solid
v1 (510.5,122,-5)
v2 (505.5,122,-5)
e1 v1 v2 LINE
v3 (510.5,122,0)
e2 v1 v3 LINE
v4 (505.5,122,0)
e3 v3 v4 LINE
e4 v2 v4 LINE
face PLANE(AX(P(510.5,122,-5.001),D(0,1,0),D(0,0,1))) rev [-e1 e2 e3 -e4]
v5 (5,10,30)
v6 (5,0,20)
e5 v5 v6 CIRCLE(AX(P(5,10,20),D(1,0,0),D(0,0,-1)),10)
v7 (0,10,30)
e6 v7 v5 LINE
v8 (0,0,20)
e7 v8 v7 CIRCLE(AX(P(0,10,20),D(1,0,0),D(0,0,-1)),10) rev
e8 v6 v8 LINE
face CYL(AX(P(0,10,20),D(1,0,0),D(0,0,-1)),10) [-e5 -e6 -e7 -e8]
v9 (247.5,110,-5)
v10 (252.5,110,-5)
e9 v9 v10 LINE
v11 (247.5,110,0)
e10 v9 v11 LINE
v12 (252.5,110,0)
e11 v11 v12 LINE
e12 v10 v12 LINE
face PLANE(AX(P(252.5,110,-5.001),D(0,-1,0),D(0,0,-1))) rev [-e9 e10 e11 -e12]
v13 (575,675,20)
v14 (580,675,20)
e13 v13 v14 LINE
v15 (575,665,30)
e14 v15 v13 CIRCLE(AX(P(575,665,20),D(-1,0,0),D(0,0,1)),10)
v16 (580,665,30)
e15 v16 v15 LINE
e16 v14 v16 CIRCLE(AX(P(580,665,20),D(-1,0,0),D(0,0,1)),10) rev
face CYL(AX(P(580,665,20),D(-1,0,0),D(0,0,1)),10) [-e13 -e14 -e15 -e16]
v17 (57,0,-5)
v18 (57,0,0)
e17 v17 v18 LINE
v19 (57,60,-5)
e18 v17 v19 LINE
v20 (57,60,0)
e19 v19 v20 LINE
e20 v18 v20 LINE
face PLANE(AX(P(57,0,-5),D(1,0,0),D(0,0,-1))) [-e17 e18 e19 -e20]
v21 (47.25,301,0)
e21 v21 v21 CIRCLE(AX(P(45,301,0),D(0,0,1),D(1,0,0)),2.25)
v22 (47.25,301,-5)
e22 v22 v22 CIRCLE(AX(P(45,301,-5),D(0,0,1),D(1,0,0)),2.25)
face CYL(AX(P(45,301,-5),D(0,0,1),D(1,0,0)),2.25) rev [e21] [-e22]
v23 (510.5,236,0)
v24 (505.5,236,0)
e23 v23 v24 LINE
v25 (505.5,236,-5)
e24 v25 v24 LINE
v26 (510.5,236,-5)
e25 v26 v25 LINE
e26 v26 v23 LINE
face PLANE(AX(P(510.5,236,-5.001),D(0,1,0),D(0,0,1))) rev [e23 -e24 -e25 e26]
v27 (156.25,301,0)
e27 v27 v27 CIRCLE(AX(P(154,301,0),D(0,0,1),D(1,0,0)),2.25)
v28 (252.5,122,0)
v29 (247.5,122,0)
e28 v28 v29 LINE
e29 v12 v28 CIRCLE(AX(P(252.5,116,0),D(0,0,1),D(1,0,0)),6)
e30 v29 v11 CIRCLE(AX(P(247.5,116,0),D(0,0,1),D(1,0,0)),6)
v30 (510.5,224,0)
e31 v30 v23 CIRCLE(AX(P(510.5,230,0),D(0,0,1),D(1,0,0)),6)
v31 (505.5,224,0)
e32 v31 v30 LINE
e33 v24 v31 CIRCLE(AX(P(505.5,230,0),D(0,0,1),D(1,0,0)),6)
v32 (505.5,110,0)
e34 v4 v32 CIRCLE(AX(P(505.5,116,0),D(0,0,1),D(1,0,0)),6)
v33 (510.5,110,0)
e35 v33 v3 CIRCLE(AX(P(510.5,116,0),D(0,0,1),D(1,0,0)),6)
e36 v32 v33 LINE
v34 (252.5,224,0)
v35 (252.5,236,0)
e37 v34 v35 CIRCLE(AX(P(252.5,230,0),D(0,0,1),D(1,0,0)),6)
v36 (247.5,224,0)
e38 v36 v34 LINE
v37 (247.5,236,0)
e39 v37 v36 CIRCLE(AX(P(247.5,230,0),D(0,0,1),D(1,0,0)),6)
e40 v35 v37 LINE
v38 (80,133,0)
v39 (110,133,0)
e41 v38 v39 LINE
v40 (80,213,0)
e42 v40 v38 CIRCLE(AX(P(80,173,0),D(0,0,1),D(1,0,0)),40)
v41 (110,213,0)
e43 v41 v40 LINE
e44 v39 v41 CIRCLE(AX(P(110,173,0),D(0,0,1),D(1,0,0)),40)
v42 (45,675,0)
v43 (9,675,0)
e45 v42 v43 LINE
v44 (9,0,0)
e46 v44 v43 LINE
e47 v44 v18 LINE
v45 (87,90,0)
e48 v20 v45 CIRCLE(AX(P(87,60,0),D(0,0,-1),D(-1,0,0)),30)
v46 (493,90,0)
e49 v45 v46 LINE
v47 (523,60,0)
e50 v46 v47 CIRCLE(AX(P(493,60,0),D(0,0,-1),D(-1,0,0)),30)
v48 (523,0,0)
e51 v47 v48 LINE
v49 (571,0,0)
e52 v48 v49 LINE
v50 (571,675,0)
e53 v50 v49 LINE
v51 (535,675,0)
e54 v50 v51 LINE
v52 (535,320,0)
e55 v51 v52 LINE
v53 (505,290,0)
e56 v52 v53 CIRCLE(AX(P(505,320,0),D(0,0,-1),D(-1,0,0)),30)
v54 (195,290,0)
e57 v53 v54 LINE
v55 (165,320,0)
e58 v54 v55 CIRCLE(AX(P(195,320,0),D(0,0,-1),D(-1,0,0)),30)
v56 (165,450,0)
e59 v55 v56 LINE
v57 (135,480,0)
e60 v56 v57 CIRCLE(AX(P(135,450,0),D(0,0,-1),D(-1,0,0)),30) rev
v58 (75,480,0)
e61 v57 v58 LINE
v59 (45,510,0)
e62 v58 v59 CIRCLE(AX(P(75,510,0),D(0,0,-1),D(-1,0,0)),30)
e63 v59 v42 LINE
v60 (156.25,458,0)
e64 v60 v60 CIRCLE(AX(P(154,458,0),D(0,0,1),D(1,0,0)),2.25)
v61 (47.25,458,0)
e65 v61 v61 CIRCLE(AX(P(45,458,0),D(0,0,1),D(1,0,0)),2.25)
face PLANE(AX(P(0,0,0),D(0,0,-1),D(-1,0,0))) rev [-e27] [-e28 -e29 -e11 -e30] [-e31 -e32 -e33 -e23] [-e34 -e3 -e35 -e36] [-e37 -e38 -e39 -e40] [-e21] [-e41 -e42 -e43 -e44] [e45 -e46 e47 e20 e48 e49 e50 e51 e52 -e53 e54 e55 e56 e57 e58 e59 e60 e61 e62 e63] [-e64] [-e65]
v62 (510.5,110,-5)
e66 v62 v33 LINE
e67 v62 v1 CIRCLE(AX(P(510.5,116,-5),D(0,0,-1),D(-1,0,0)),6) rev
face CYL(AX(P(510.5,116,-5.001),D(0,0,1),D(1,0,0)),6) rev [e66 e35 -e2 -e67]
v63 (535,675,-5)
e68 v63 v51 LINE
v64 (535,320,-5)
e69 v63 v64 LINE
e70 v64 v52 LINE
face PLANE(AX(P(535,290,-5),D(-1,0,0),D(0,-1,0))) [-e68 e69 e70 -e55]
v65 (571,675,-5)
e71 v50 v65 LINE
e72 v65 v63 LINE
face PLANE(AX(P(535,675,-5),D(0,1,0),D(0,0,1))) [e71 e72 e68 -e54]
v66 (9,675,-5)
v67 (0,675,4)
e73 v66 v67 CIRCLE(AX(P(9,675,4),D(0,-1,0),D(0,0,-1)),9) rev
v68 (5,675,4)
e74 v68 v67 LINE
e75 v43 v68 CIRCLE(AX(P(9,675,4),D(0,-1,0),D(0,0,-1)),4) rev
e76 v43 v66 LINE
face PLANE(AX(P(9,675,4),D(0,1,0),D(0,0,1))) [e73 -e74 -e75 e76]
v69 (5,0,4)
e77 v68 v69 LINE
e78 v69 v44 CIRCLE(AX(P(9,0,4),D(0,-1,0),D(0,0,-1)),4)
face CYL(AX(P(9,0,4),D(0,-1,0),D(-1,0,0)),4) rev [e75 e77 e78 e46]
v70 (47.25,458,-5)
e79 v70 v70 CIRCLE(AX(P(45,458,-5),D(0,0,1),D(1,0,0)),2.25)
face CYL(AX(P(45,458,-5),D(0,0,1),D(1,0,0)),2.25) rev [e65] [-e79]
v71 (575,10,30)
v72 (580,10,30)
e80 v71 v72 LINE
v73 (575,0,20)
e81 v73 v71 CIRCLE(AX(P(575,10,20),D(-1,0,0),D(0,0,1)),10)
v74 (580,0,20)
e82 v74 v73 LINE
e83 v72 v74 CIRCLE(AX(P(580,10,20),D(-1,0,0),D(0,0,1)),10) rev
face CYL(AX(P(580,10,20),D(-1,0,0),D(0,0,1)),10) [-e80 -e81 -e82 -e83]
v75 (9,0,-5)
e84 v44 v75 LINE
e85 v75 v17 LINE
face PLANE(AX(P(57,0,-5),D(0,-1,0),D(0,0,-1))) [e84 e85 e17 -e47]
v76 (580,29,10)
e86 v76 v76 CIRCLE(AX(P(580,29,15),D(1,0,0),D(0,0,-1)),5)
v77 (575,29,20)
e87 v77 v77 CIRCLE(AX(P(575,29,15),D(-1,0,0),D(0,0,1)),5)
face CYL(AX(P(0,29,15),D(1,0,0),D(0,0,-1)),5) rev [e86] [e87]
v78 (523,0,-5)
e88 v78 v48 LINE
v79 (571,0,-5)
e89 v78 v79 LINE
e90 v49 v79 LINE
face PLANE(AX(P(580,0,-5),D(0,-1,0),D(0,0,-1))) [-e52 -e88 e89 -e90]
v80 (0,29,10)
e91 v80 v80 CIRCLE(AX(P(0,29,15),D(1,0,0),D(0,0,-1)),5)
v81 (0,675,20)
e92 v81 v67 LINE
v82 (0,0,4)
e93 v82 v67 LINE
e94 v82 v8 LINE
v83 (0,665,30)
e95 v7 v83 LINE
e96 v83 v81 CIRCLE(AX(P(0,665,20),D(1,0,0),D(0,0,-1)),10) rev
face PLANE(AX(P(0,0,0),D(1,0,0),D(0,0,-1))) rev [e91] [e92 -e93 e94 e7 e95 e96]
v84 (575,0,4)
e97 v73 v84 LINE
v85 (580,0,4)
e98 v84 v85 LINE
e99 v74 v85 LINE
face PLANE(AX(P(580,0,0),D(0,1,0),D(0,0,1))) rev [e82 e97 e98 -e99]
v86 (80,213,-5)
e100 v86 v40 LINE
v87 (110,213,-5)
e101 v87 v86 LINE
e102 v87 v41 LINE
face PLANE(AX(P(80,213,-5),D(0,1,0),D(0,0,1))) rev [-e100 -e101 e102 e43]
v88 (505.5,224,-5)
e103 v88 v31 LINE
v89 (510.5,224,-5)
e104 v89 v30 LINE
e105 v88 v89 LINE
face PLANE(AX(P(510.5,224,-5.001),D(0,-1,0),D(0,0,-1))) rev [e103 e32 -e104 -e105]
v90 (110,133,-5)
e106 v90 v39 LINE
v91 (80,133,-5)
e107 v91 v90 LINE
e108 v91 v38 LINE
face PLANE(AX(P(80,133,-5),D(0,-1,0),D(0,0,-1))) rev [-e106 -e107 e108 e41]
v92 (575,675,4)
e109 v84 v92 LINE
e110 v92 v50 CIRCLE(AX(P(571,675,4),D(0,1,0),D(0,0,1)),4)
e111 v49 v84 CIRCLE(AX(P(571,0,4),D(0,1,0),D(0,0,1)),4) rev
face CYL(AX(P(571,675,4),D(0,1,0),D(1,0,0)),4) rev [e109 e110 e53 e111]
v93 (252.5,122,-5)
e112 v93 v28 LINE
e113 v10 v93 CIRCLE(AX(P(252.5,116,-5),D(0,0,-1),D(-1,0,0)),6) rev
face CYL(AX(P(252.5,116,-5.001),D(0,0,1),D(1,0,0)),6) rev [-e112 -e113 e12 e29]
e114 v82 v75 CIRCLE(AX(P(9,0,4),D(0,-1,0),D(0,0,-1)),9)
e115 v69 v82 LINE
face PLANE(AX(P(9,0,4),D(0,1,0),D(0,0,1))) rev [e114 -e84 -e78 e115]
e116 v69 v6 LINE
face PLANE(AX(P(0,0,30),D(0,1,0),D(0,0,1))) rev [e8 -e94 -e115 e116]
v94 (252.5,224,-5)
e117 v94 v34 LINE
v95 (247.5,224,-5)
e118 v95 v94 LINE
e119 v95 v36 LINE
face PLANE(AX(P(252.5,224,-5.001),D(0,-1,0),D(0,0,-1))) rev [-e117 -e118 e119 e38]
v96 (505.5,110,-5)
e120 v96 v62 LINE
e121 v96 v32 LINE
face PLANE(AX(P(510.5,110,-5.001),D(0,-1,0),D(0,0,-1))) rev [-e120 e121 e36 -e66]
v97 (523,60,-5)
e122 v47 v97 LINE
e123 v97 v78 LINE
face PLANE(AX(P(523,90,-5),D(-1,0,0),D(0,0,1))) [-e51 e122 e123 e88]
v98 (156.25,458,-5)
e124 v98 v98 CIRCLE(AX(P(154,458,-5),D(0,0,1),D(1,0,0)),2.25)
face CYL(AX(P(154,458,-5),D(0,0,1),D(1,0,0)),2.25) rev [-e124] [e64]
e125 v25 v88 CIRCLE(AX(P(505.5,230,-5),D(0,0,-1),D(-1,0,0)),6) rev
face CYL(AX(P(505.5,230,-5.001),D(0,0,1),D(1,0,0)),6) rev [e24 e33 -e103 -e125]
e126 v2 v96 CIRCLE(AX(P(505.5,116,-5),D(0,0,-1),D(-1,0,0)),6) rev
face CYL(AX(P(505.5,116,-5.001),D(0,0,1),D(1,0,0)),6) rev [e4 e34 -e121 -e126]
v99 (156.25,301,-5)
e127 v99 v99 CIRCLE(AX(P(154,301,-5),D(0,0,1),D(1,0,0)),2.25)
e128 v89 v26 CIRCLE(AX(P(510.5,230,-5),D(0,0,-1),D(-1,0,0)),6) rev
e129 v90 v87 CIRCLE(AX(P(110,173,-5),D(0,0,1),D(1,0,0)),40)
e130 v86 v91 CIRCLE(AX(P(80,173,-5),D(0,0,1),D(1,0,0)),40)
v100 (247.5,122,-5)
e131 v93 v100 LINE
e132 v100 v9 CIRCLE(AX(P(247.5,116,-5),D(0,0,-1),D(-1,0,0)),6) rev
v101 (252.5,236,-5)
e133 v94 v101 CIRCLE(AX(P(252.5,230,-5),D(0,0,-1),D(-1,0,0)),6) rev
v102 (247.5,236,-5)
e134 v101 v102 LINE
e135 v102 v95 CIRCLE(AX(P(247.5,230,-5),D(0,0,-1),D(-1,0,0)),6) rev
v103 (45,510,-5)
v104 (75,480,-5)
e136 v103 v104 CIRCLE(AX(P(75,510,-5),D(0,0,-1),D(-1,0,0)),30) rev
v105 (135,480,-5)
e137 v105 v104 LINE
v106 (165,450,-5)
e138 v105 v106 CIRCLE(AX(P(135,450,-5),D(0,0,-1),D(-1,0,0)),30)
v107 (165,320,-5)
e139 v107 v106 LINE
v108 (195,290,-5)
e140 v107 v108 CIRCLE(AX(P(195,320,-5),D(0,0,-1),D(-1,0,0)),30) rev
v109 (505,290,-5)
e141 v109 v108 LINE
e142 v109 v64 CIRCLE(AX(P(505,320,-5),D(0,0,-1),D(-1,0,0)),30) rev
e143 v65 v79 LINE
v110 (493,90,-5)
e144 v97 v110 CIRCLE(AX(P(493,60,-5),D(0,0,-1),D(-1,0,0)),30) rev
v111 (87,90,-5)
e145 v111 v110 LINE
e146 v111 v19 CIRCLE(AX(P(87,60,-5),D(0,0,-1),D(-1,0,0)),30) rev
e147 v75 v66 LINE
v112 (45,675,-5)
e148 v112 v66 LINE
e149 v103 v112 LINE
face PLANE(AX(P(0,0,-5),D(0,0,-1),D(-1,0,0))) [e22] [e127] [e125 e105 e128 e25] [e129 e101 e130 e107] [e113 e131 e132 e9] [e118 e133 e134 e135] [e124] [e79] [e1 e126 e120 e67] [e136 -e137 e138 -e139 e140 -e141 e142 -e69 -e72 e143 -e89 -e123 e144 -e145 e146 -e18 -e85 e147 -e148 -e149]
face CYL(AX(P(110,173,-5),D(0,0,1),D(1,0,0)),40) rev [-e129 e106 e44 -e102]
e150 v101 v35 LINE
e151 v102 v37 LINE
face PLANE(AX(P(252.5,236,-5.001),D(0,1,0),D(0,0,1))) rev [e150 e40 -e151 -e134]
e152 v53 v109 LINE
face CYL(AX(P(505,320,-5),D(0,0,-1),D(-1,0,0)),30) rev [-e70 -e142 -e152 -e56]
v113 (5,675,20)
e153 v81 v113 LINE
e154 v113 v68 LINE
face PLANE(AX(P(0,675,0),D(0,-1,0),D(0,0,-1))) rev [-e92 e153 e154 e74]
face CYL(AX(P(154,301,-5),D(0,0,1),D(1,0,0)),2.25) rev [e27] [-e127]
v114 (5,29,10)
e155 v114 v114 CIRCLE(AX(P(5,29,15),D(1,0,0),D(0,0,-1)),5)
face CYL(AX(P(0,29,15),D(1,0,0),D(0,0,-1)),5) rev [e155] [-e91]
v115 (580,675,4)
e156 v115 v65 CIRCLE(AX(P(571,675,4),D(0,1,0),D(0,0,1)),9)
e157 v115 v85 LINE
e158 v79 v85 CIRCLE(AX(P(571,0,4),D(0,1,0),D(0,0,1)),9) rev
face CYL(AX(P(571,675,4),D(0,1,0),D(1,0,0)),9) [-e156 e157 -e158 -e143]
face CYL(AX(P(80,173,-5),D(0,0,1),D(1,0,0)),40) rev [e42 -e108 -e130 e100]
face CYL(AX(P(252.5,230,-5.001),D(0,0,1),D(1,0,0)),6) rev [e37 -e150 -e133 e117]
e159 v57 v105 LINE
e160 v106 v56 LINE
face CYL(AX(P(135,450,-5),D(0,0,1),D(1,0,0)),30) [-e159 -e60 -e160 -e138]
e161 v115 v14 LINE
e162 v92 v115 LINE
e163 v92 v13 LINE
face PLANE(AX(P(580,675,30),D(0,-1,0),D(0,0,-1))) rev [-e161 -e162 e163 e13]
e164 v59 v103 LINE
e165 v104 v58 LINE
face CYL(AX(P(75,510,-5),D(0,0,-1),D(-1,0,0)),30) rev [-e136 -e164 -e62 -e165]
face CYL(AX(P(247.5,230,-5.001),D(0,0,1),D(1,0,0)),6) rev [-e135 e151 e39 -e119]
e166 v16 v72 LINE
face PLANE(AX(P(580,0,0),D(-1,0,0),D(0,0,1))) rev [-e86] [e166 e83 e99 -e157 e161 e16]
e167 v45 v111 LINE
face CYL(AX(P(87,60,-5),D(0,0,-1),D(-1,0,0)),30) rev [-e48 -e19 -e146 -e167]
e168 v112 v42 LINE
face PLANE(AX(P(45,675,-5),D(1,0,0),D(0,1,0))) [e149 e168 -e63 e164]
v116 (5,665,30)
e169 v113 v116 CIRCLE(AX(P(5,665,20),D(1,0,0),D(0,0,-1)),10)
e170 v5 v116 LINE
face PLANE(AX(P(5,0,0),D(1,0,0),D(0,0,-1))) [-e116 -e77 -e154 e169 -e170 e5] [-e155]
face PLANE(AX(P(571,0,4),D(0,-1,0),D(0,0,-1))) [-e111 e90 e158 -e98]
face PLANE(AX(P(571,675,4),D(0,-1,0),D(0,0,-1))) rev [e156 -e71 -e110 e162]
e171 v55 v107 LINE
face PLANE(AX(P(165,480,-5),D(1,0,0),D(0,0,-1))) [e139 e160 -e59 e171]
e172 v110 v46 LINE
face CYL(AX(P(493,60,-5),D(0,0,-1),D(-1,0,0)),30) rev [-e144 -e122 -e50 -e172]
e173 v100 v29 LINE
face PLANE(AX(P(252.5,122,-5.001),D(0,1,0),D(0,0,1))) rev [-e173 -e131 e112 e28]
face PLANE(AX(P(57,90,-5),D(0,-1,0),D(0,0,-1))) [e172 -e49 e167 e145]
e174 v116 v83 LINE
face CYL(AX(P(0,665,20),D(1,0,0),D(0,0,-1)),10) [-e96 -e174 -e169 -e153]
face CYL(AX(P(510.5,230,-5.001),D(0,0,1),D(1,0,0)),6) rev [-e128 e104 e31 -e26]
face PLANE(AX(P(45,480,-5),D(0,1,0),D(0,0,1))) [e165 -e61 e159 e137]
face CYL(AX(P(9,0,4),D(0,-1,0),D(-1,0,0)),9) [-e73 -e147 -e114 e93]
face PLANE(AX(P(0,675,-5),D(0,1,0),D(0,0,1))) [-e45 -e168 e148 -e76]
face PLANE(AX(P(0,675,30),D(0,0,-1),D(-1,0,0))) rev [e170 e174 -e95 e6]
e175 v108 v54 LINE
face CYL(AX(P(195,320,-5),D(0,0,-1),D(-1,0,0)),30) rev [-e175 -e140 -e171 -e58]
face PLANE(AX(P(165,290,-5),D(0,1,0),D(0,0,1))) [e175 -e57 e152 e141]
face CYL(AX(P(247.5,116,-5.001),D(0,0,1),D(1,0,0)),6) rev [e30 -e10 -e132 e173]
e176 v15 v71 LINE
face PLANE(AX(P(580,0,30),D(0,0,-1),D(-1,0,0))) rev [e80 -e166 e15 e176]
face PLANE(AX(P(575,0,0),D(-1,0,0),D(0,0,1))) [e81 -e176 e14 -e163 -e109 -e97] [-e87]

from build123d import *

# Parameters (mm, degrees)
SKETCH_1_R                         = 2.25
SM_BASE_FLANGE_1_DEPTH             = 5
FILLET_1_R                         = 30
SM_EDGE_FLANGE_1_STRIP_W           = 28
SM_EDGE_FLANGE_1_STRIP_H           = 5
SM_EDGE_FLANGE_1_STRIP_CUT_DEPTH   = 675
SM_EDGE_FLANGE_1_STRIP_2_W         = 28
SM_EDGE_FLANGE_1_STRIP_2_H         = 5
SM_EDGE_FLANGE_1_STRIP_CUT_2_DEPTH = 675
SM_EDGE_FLANGE_1_DEPTH             = 675
SM_EDGE_FLANGE_1_BEND_DEPTH        = 675
CUT_EXTRUDE_3_REACH                = 892.463
FILLET_2_R                         = 10
SKETCH_12_R                        = 5
CUT_EXTRUDE_4_DEPTH                = 891.463362525


# Sheet-metal steps are written as plain solids
with BuildPart() as part:
    # Sketch 1 → 基体-法兰1 (new body)
    with BuildSketch(Plane.XY):
        Polygon((0, 0), (0, 675), (45, 675), (45, 480), (165, 480), (165, 290), (535, 290), (535, 675), (580, 675), (580, 0), (523, 0), (523, 90), (57, 90), (57, 0), align=None)
        with Locations((154, 458)):
            Circle(SKETCH_1_R, mode=Mode.SUBTRACT)
        with Locations((45, 458)):
            Circle(SKETCH_1_R, mode=Mode.SUBTRACT)
        with Locations((154, 301)):
            Circle(SKETCH_1_R, mode=Mode.SUBTRACT)
        with Locations((45, 301)):
            Circle(SKETCH_1_R, mode=Mode.SUBTRACT)
        with BuildLine():
            Line((80, 133), (110, 133))
            ThreePointArc((110, 133), (150, 173), (110, 213))
            Line((110, 213), (80, 213))
            ThreePointArc((80, 213), (40, 173), (80, 133))
        make_face(mode=Mode.SUBTRACT)
    extrude(amount=-SM_BASE_FLANGE_1_DEPTH)

    # 圆角1
    fillet_1_edges = [part.edges().sort_by_distance(p)[0] for p in [
        (45, 480, -2.5),
        (165, 480, -2.5),
        (165, 290, -2.5),
        (535, 290, -2.5),
        (523, 90, -2.5),
        (57, 90, -2.5),
    ]]
    fillet(fillet_1_edges, radius=FILLET_1_R)

    # 边线-法兰1 strip (across the edge) → 边线-法兰1 strip cut (cut)
    with BuildSketch(Plane.XZ.offset(-675)):
        with Locations((-5, -2.5)):
            Rectangle(SM_EDGE_FLANGE_1_STRIP_W, SM_EDGE_FLANGE_1_STRIP_H)
    extrude(amount=SM_EDGE_FLANGE_1_STRIP_CUT_DEPTH, mode=Mode.SUBTRACT)

    # 边线-法兰1 strip 2 (across the edge) → 边线-法兰1 strip cut 2 (cut)
    with BuildSketch(Plane(origin=(580, 0, 0), x_dir=(-1, 0, 0), z_dir=(0, 1, 0))):
        with Locations((-5, -2.5)):
            Rectangle(SM_EDGE_FLANGE_1_STRIP_2_W, SM_EDGE_FLANGE_1_STRIP_2_H)
    extrude(amount=SM_EDGE_FLANGE_1_STRIP_CUT_2_DEPTH, mode=Mode.SUBTRACT)

    # 边线-法兰1 section (across the edge) → 边线-法兰1 (add)
    with BuildSketch(Plane.XZ.offset(-675)):
        with BuildLine():
            Line((0, 4), (0, 30))
            Line((0, 30), (5, 30))
            Line((5, 30), (5, 4))
            ThreePointArc((5, 4), (6.171572875, 1.171572875), (9, 0))
            Line((9, 0), (9, -5))
            ThreePointArc((9, -5), (2.636038969, -2.363961031), (0, 4))
        make_face()
    extrude(amount=SM_EDGE_FLANGE_1_DEPTH)

    # 边线-法兰1 section 2 (across the edge) → 边线-法兰1 bend (add)
    with BuildSketch(Plane(origin=(580, 0, 0), x_dir=(-1, 0, 0), z_dir=(0, 1, 0))):
        with BuildLine():
            Line((0, 4), (0, 30))
            Line((0, 30), (5, 30))
            Line((5, 30), (5, 4))
            ThreePointArc((5, 4), (6.171572875, 1.171572875), (9, 0))
            Line((9, 0), (9, -5))
            ThreePointArc((9, -5), (2.636038969, -2.363961031), (0, 4))
        make_face()
    extrude(amount=SM_EDGE_FLANGE_1_BEND_DEPTH)

    # 草图11 → 切除-拉伸3 (cut, up to next)
    with BuildSketch(Plane.XY, mode=Mode.PRIVATE) as cut_extrude_3_sk1:
        with BuildLine():
            Line((252.5, 110), (247.5, 110))
            ThreePointArc((247.5, 110), (241.5, 116), (247.5, 122))
            Line((247.5, 122), (252.5, 122))
            ThreePointArc((252.5, 122), (258.5, 116), (252.5, 110))
        make_face()
    cut_extrude_3_tool1 = extrude(cut_extrude_3_sk1.sketch, amount=-CUT_EXTRUDE_3_REACH, mode=Mode.PRIVATE) & part.part
    # 草图11 → 切除-拉伸3 (cut, up to next)
    with BuildSketch(Plane.XY, mode=Mode.PRIVATE) as cut_extrude_3_sk2:
        with BuildLine():
            Line((510.5, 110), (505.5, 110))
            ThreePointArc((505.5, 110), (499.5, 116), (505.5, 122))
            Line((505.5, 122), (510.5, 122))
            ThreePointArc((510.5, 122), (516.5, 116), (510.5, 110))
        make_face()
    cut_extrude_3_tool2 = extrude(cut_extrude_3_sk2.sketch, amount=-CUT_EXTRUDE_3_REACH, mode=Mode.PRIVATE) & part.part
    # 草图11 → 切除-拉伸3 (cut, up to next)
    with BuildSketch(Plane.XY, mode=Mode.PRIVATE) as cut_extrude_3_sk3:
        with BuildLine():
            Line((510.5, 224), (505.5, 224))
            ThreePointArc((505.5, 224), (499.5, 230), (505.5, 236))
            Line((505.5, 236), (510.5, 236))
            ThreePointArc((510.5, 236), (516.5, 230), (510.5, 224))
        make_face()
    cut_extrude_3_tool3 = extrude(cut_extrude_3_sk3.sketch, amount=-CUT_EXTRUDE_3_REACH, mode=Mode.PRIVATE) & part.part
    # 草图11 → 切除-拉伸3 (cut, up to next)
    with BuildSketch(Plane.XY, mode=Mode.PRIVATE) as cut_extrude_3_sk4:
        with BuildLine():
            Line((252.5, 224), (247.5, 224))
            ThreePointArc((247.5, 224), (241.5, 230), (247.5, 236))
            Line((247.5, 236), (252.5, 236))
            ThreePointArc((252.5, 236), (258.5, 230), (252.5, 224))
        make_face()
    cut_extrude_3_tool4 = extrude(cut_extrude_3_sk4.sketch, amount=-CUT_EXTRUDE_3_REACH, mode=Mode.PRIVATE) & part.part
    add(cut_extrude_3_tool1.solids().sort_by_distance((250, 116, 0))[0], mode=Mode.SUBTRACT)
    add(cut_extrude_3_tool2.solids().sort_by_distance((508, 116, 0))[0], mode=Mode.SUBTRACT)
    add(cut_extrude_3_tool3.solids().sort_by_distance((508, 230, 0))[0], mode=Mode.SUBTRACT)
    add(cut_extrude_3_tool4.solids().sort_by_distance((250, 230, 0))[0], mode=Mode.SUBTRACT)

    # 圆角2
    fillet_2_edges = [part.edges().sort_by_distance(p)[0] for p in [
        (2.5, 675, 30),
        (2.5, 0, 30),
        (577.5, 0, 30),
        (577.5, 675, 30),
    ]]
    fillet(fillet_2_edges, radius=FILLET_2_R)

    # 草图12 → 切除-拉伸4 (cut, through all)
    with BuildSketch(Plane(origin=(580, 0, 0), x_dir=(0, 0, -1), z_dir=(1, 0, 0))):
        with Locations((-15, 29)):
            Circle(SKETCH_12_R)
    extrude(amount=-CUT_EXTRUDE_4_DEPTH, mode=Mode.SUBTRACT)


solid = part.part
